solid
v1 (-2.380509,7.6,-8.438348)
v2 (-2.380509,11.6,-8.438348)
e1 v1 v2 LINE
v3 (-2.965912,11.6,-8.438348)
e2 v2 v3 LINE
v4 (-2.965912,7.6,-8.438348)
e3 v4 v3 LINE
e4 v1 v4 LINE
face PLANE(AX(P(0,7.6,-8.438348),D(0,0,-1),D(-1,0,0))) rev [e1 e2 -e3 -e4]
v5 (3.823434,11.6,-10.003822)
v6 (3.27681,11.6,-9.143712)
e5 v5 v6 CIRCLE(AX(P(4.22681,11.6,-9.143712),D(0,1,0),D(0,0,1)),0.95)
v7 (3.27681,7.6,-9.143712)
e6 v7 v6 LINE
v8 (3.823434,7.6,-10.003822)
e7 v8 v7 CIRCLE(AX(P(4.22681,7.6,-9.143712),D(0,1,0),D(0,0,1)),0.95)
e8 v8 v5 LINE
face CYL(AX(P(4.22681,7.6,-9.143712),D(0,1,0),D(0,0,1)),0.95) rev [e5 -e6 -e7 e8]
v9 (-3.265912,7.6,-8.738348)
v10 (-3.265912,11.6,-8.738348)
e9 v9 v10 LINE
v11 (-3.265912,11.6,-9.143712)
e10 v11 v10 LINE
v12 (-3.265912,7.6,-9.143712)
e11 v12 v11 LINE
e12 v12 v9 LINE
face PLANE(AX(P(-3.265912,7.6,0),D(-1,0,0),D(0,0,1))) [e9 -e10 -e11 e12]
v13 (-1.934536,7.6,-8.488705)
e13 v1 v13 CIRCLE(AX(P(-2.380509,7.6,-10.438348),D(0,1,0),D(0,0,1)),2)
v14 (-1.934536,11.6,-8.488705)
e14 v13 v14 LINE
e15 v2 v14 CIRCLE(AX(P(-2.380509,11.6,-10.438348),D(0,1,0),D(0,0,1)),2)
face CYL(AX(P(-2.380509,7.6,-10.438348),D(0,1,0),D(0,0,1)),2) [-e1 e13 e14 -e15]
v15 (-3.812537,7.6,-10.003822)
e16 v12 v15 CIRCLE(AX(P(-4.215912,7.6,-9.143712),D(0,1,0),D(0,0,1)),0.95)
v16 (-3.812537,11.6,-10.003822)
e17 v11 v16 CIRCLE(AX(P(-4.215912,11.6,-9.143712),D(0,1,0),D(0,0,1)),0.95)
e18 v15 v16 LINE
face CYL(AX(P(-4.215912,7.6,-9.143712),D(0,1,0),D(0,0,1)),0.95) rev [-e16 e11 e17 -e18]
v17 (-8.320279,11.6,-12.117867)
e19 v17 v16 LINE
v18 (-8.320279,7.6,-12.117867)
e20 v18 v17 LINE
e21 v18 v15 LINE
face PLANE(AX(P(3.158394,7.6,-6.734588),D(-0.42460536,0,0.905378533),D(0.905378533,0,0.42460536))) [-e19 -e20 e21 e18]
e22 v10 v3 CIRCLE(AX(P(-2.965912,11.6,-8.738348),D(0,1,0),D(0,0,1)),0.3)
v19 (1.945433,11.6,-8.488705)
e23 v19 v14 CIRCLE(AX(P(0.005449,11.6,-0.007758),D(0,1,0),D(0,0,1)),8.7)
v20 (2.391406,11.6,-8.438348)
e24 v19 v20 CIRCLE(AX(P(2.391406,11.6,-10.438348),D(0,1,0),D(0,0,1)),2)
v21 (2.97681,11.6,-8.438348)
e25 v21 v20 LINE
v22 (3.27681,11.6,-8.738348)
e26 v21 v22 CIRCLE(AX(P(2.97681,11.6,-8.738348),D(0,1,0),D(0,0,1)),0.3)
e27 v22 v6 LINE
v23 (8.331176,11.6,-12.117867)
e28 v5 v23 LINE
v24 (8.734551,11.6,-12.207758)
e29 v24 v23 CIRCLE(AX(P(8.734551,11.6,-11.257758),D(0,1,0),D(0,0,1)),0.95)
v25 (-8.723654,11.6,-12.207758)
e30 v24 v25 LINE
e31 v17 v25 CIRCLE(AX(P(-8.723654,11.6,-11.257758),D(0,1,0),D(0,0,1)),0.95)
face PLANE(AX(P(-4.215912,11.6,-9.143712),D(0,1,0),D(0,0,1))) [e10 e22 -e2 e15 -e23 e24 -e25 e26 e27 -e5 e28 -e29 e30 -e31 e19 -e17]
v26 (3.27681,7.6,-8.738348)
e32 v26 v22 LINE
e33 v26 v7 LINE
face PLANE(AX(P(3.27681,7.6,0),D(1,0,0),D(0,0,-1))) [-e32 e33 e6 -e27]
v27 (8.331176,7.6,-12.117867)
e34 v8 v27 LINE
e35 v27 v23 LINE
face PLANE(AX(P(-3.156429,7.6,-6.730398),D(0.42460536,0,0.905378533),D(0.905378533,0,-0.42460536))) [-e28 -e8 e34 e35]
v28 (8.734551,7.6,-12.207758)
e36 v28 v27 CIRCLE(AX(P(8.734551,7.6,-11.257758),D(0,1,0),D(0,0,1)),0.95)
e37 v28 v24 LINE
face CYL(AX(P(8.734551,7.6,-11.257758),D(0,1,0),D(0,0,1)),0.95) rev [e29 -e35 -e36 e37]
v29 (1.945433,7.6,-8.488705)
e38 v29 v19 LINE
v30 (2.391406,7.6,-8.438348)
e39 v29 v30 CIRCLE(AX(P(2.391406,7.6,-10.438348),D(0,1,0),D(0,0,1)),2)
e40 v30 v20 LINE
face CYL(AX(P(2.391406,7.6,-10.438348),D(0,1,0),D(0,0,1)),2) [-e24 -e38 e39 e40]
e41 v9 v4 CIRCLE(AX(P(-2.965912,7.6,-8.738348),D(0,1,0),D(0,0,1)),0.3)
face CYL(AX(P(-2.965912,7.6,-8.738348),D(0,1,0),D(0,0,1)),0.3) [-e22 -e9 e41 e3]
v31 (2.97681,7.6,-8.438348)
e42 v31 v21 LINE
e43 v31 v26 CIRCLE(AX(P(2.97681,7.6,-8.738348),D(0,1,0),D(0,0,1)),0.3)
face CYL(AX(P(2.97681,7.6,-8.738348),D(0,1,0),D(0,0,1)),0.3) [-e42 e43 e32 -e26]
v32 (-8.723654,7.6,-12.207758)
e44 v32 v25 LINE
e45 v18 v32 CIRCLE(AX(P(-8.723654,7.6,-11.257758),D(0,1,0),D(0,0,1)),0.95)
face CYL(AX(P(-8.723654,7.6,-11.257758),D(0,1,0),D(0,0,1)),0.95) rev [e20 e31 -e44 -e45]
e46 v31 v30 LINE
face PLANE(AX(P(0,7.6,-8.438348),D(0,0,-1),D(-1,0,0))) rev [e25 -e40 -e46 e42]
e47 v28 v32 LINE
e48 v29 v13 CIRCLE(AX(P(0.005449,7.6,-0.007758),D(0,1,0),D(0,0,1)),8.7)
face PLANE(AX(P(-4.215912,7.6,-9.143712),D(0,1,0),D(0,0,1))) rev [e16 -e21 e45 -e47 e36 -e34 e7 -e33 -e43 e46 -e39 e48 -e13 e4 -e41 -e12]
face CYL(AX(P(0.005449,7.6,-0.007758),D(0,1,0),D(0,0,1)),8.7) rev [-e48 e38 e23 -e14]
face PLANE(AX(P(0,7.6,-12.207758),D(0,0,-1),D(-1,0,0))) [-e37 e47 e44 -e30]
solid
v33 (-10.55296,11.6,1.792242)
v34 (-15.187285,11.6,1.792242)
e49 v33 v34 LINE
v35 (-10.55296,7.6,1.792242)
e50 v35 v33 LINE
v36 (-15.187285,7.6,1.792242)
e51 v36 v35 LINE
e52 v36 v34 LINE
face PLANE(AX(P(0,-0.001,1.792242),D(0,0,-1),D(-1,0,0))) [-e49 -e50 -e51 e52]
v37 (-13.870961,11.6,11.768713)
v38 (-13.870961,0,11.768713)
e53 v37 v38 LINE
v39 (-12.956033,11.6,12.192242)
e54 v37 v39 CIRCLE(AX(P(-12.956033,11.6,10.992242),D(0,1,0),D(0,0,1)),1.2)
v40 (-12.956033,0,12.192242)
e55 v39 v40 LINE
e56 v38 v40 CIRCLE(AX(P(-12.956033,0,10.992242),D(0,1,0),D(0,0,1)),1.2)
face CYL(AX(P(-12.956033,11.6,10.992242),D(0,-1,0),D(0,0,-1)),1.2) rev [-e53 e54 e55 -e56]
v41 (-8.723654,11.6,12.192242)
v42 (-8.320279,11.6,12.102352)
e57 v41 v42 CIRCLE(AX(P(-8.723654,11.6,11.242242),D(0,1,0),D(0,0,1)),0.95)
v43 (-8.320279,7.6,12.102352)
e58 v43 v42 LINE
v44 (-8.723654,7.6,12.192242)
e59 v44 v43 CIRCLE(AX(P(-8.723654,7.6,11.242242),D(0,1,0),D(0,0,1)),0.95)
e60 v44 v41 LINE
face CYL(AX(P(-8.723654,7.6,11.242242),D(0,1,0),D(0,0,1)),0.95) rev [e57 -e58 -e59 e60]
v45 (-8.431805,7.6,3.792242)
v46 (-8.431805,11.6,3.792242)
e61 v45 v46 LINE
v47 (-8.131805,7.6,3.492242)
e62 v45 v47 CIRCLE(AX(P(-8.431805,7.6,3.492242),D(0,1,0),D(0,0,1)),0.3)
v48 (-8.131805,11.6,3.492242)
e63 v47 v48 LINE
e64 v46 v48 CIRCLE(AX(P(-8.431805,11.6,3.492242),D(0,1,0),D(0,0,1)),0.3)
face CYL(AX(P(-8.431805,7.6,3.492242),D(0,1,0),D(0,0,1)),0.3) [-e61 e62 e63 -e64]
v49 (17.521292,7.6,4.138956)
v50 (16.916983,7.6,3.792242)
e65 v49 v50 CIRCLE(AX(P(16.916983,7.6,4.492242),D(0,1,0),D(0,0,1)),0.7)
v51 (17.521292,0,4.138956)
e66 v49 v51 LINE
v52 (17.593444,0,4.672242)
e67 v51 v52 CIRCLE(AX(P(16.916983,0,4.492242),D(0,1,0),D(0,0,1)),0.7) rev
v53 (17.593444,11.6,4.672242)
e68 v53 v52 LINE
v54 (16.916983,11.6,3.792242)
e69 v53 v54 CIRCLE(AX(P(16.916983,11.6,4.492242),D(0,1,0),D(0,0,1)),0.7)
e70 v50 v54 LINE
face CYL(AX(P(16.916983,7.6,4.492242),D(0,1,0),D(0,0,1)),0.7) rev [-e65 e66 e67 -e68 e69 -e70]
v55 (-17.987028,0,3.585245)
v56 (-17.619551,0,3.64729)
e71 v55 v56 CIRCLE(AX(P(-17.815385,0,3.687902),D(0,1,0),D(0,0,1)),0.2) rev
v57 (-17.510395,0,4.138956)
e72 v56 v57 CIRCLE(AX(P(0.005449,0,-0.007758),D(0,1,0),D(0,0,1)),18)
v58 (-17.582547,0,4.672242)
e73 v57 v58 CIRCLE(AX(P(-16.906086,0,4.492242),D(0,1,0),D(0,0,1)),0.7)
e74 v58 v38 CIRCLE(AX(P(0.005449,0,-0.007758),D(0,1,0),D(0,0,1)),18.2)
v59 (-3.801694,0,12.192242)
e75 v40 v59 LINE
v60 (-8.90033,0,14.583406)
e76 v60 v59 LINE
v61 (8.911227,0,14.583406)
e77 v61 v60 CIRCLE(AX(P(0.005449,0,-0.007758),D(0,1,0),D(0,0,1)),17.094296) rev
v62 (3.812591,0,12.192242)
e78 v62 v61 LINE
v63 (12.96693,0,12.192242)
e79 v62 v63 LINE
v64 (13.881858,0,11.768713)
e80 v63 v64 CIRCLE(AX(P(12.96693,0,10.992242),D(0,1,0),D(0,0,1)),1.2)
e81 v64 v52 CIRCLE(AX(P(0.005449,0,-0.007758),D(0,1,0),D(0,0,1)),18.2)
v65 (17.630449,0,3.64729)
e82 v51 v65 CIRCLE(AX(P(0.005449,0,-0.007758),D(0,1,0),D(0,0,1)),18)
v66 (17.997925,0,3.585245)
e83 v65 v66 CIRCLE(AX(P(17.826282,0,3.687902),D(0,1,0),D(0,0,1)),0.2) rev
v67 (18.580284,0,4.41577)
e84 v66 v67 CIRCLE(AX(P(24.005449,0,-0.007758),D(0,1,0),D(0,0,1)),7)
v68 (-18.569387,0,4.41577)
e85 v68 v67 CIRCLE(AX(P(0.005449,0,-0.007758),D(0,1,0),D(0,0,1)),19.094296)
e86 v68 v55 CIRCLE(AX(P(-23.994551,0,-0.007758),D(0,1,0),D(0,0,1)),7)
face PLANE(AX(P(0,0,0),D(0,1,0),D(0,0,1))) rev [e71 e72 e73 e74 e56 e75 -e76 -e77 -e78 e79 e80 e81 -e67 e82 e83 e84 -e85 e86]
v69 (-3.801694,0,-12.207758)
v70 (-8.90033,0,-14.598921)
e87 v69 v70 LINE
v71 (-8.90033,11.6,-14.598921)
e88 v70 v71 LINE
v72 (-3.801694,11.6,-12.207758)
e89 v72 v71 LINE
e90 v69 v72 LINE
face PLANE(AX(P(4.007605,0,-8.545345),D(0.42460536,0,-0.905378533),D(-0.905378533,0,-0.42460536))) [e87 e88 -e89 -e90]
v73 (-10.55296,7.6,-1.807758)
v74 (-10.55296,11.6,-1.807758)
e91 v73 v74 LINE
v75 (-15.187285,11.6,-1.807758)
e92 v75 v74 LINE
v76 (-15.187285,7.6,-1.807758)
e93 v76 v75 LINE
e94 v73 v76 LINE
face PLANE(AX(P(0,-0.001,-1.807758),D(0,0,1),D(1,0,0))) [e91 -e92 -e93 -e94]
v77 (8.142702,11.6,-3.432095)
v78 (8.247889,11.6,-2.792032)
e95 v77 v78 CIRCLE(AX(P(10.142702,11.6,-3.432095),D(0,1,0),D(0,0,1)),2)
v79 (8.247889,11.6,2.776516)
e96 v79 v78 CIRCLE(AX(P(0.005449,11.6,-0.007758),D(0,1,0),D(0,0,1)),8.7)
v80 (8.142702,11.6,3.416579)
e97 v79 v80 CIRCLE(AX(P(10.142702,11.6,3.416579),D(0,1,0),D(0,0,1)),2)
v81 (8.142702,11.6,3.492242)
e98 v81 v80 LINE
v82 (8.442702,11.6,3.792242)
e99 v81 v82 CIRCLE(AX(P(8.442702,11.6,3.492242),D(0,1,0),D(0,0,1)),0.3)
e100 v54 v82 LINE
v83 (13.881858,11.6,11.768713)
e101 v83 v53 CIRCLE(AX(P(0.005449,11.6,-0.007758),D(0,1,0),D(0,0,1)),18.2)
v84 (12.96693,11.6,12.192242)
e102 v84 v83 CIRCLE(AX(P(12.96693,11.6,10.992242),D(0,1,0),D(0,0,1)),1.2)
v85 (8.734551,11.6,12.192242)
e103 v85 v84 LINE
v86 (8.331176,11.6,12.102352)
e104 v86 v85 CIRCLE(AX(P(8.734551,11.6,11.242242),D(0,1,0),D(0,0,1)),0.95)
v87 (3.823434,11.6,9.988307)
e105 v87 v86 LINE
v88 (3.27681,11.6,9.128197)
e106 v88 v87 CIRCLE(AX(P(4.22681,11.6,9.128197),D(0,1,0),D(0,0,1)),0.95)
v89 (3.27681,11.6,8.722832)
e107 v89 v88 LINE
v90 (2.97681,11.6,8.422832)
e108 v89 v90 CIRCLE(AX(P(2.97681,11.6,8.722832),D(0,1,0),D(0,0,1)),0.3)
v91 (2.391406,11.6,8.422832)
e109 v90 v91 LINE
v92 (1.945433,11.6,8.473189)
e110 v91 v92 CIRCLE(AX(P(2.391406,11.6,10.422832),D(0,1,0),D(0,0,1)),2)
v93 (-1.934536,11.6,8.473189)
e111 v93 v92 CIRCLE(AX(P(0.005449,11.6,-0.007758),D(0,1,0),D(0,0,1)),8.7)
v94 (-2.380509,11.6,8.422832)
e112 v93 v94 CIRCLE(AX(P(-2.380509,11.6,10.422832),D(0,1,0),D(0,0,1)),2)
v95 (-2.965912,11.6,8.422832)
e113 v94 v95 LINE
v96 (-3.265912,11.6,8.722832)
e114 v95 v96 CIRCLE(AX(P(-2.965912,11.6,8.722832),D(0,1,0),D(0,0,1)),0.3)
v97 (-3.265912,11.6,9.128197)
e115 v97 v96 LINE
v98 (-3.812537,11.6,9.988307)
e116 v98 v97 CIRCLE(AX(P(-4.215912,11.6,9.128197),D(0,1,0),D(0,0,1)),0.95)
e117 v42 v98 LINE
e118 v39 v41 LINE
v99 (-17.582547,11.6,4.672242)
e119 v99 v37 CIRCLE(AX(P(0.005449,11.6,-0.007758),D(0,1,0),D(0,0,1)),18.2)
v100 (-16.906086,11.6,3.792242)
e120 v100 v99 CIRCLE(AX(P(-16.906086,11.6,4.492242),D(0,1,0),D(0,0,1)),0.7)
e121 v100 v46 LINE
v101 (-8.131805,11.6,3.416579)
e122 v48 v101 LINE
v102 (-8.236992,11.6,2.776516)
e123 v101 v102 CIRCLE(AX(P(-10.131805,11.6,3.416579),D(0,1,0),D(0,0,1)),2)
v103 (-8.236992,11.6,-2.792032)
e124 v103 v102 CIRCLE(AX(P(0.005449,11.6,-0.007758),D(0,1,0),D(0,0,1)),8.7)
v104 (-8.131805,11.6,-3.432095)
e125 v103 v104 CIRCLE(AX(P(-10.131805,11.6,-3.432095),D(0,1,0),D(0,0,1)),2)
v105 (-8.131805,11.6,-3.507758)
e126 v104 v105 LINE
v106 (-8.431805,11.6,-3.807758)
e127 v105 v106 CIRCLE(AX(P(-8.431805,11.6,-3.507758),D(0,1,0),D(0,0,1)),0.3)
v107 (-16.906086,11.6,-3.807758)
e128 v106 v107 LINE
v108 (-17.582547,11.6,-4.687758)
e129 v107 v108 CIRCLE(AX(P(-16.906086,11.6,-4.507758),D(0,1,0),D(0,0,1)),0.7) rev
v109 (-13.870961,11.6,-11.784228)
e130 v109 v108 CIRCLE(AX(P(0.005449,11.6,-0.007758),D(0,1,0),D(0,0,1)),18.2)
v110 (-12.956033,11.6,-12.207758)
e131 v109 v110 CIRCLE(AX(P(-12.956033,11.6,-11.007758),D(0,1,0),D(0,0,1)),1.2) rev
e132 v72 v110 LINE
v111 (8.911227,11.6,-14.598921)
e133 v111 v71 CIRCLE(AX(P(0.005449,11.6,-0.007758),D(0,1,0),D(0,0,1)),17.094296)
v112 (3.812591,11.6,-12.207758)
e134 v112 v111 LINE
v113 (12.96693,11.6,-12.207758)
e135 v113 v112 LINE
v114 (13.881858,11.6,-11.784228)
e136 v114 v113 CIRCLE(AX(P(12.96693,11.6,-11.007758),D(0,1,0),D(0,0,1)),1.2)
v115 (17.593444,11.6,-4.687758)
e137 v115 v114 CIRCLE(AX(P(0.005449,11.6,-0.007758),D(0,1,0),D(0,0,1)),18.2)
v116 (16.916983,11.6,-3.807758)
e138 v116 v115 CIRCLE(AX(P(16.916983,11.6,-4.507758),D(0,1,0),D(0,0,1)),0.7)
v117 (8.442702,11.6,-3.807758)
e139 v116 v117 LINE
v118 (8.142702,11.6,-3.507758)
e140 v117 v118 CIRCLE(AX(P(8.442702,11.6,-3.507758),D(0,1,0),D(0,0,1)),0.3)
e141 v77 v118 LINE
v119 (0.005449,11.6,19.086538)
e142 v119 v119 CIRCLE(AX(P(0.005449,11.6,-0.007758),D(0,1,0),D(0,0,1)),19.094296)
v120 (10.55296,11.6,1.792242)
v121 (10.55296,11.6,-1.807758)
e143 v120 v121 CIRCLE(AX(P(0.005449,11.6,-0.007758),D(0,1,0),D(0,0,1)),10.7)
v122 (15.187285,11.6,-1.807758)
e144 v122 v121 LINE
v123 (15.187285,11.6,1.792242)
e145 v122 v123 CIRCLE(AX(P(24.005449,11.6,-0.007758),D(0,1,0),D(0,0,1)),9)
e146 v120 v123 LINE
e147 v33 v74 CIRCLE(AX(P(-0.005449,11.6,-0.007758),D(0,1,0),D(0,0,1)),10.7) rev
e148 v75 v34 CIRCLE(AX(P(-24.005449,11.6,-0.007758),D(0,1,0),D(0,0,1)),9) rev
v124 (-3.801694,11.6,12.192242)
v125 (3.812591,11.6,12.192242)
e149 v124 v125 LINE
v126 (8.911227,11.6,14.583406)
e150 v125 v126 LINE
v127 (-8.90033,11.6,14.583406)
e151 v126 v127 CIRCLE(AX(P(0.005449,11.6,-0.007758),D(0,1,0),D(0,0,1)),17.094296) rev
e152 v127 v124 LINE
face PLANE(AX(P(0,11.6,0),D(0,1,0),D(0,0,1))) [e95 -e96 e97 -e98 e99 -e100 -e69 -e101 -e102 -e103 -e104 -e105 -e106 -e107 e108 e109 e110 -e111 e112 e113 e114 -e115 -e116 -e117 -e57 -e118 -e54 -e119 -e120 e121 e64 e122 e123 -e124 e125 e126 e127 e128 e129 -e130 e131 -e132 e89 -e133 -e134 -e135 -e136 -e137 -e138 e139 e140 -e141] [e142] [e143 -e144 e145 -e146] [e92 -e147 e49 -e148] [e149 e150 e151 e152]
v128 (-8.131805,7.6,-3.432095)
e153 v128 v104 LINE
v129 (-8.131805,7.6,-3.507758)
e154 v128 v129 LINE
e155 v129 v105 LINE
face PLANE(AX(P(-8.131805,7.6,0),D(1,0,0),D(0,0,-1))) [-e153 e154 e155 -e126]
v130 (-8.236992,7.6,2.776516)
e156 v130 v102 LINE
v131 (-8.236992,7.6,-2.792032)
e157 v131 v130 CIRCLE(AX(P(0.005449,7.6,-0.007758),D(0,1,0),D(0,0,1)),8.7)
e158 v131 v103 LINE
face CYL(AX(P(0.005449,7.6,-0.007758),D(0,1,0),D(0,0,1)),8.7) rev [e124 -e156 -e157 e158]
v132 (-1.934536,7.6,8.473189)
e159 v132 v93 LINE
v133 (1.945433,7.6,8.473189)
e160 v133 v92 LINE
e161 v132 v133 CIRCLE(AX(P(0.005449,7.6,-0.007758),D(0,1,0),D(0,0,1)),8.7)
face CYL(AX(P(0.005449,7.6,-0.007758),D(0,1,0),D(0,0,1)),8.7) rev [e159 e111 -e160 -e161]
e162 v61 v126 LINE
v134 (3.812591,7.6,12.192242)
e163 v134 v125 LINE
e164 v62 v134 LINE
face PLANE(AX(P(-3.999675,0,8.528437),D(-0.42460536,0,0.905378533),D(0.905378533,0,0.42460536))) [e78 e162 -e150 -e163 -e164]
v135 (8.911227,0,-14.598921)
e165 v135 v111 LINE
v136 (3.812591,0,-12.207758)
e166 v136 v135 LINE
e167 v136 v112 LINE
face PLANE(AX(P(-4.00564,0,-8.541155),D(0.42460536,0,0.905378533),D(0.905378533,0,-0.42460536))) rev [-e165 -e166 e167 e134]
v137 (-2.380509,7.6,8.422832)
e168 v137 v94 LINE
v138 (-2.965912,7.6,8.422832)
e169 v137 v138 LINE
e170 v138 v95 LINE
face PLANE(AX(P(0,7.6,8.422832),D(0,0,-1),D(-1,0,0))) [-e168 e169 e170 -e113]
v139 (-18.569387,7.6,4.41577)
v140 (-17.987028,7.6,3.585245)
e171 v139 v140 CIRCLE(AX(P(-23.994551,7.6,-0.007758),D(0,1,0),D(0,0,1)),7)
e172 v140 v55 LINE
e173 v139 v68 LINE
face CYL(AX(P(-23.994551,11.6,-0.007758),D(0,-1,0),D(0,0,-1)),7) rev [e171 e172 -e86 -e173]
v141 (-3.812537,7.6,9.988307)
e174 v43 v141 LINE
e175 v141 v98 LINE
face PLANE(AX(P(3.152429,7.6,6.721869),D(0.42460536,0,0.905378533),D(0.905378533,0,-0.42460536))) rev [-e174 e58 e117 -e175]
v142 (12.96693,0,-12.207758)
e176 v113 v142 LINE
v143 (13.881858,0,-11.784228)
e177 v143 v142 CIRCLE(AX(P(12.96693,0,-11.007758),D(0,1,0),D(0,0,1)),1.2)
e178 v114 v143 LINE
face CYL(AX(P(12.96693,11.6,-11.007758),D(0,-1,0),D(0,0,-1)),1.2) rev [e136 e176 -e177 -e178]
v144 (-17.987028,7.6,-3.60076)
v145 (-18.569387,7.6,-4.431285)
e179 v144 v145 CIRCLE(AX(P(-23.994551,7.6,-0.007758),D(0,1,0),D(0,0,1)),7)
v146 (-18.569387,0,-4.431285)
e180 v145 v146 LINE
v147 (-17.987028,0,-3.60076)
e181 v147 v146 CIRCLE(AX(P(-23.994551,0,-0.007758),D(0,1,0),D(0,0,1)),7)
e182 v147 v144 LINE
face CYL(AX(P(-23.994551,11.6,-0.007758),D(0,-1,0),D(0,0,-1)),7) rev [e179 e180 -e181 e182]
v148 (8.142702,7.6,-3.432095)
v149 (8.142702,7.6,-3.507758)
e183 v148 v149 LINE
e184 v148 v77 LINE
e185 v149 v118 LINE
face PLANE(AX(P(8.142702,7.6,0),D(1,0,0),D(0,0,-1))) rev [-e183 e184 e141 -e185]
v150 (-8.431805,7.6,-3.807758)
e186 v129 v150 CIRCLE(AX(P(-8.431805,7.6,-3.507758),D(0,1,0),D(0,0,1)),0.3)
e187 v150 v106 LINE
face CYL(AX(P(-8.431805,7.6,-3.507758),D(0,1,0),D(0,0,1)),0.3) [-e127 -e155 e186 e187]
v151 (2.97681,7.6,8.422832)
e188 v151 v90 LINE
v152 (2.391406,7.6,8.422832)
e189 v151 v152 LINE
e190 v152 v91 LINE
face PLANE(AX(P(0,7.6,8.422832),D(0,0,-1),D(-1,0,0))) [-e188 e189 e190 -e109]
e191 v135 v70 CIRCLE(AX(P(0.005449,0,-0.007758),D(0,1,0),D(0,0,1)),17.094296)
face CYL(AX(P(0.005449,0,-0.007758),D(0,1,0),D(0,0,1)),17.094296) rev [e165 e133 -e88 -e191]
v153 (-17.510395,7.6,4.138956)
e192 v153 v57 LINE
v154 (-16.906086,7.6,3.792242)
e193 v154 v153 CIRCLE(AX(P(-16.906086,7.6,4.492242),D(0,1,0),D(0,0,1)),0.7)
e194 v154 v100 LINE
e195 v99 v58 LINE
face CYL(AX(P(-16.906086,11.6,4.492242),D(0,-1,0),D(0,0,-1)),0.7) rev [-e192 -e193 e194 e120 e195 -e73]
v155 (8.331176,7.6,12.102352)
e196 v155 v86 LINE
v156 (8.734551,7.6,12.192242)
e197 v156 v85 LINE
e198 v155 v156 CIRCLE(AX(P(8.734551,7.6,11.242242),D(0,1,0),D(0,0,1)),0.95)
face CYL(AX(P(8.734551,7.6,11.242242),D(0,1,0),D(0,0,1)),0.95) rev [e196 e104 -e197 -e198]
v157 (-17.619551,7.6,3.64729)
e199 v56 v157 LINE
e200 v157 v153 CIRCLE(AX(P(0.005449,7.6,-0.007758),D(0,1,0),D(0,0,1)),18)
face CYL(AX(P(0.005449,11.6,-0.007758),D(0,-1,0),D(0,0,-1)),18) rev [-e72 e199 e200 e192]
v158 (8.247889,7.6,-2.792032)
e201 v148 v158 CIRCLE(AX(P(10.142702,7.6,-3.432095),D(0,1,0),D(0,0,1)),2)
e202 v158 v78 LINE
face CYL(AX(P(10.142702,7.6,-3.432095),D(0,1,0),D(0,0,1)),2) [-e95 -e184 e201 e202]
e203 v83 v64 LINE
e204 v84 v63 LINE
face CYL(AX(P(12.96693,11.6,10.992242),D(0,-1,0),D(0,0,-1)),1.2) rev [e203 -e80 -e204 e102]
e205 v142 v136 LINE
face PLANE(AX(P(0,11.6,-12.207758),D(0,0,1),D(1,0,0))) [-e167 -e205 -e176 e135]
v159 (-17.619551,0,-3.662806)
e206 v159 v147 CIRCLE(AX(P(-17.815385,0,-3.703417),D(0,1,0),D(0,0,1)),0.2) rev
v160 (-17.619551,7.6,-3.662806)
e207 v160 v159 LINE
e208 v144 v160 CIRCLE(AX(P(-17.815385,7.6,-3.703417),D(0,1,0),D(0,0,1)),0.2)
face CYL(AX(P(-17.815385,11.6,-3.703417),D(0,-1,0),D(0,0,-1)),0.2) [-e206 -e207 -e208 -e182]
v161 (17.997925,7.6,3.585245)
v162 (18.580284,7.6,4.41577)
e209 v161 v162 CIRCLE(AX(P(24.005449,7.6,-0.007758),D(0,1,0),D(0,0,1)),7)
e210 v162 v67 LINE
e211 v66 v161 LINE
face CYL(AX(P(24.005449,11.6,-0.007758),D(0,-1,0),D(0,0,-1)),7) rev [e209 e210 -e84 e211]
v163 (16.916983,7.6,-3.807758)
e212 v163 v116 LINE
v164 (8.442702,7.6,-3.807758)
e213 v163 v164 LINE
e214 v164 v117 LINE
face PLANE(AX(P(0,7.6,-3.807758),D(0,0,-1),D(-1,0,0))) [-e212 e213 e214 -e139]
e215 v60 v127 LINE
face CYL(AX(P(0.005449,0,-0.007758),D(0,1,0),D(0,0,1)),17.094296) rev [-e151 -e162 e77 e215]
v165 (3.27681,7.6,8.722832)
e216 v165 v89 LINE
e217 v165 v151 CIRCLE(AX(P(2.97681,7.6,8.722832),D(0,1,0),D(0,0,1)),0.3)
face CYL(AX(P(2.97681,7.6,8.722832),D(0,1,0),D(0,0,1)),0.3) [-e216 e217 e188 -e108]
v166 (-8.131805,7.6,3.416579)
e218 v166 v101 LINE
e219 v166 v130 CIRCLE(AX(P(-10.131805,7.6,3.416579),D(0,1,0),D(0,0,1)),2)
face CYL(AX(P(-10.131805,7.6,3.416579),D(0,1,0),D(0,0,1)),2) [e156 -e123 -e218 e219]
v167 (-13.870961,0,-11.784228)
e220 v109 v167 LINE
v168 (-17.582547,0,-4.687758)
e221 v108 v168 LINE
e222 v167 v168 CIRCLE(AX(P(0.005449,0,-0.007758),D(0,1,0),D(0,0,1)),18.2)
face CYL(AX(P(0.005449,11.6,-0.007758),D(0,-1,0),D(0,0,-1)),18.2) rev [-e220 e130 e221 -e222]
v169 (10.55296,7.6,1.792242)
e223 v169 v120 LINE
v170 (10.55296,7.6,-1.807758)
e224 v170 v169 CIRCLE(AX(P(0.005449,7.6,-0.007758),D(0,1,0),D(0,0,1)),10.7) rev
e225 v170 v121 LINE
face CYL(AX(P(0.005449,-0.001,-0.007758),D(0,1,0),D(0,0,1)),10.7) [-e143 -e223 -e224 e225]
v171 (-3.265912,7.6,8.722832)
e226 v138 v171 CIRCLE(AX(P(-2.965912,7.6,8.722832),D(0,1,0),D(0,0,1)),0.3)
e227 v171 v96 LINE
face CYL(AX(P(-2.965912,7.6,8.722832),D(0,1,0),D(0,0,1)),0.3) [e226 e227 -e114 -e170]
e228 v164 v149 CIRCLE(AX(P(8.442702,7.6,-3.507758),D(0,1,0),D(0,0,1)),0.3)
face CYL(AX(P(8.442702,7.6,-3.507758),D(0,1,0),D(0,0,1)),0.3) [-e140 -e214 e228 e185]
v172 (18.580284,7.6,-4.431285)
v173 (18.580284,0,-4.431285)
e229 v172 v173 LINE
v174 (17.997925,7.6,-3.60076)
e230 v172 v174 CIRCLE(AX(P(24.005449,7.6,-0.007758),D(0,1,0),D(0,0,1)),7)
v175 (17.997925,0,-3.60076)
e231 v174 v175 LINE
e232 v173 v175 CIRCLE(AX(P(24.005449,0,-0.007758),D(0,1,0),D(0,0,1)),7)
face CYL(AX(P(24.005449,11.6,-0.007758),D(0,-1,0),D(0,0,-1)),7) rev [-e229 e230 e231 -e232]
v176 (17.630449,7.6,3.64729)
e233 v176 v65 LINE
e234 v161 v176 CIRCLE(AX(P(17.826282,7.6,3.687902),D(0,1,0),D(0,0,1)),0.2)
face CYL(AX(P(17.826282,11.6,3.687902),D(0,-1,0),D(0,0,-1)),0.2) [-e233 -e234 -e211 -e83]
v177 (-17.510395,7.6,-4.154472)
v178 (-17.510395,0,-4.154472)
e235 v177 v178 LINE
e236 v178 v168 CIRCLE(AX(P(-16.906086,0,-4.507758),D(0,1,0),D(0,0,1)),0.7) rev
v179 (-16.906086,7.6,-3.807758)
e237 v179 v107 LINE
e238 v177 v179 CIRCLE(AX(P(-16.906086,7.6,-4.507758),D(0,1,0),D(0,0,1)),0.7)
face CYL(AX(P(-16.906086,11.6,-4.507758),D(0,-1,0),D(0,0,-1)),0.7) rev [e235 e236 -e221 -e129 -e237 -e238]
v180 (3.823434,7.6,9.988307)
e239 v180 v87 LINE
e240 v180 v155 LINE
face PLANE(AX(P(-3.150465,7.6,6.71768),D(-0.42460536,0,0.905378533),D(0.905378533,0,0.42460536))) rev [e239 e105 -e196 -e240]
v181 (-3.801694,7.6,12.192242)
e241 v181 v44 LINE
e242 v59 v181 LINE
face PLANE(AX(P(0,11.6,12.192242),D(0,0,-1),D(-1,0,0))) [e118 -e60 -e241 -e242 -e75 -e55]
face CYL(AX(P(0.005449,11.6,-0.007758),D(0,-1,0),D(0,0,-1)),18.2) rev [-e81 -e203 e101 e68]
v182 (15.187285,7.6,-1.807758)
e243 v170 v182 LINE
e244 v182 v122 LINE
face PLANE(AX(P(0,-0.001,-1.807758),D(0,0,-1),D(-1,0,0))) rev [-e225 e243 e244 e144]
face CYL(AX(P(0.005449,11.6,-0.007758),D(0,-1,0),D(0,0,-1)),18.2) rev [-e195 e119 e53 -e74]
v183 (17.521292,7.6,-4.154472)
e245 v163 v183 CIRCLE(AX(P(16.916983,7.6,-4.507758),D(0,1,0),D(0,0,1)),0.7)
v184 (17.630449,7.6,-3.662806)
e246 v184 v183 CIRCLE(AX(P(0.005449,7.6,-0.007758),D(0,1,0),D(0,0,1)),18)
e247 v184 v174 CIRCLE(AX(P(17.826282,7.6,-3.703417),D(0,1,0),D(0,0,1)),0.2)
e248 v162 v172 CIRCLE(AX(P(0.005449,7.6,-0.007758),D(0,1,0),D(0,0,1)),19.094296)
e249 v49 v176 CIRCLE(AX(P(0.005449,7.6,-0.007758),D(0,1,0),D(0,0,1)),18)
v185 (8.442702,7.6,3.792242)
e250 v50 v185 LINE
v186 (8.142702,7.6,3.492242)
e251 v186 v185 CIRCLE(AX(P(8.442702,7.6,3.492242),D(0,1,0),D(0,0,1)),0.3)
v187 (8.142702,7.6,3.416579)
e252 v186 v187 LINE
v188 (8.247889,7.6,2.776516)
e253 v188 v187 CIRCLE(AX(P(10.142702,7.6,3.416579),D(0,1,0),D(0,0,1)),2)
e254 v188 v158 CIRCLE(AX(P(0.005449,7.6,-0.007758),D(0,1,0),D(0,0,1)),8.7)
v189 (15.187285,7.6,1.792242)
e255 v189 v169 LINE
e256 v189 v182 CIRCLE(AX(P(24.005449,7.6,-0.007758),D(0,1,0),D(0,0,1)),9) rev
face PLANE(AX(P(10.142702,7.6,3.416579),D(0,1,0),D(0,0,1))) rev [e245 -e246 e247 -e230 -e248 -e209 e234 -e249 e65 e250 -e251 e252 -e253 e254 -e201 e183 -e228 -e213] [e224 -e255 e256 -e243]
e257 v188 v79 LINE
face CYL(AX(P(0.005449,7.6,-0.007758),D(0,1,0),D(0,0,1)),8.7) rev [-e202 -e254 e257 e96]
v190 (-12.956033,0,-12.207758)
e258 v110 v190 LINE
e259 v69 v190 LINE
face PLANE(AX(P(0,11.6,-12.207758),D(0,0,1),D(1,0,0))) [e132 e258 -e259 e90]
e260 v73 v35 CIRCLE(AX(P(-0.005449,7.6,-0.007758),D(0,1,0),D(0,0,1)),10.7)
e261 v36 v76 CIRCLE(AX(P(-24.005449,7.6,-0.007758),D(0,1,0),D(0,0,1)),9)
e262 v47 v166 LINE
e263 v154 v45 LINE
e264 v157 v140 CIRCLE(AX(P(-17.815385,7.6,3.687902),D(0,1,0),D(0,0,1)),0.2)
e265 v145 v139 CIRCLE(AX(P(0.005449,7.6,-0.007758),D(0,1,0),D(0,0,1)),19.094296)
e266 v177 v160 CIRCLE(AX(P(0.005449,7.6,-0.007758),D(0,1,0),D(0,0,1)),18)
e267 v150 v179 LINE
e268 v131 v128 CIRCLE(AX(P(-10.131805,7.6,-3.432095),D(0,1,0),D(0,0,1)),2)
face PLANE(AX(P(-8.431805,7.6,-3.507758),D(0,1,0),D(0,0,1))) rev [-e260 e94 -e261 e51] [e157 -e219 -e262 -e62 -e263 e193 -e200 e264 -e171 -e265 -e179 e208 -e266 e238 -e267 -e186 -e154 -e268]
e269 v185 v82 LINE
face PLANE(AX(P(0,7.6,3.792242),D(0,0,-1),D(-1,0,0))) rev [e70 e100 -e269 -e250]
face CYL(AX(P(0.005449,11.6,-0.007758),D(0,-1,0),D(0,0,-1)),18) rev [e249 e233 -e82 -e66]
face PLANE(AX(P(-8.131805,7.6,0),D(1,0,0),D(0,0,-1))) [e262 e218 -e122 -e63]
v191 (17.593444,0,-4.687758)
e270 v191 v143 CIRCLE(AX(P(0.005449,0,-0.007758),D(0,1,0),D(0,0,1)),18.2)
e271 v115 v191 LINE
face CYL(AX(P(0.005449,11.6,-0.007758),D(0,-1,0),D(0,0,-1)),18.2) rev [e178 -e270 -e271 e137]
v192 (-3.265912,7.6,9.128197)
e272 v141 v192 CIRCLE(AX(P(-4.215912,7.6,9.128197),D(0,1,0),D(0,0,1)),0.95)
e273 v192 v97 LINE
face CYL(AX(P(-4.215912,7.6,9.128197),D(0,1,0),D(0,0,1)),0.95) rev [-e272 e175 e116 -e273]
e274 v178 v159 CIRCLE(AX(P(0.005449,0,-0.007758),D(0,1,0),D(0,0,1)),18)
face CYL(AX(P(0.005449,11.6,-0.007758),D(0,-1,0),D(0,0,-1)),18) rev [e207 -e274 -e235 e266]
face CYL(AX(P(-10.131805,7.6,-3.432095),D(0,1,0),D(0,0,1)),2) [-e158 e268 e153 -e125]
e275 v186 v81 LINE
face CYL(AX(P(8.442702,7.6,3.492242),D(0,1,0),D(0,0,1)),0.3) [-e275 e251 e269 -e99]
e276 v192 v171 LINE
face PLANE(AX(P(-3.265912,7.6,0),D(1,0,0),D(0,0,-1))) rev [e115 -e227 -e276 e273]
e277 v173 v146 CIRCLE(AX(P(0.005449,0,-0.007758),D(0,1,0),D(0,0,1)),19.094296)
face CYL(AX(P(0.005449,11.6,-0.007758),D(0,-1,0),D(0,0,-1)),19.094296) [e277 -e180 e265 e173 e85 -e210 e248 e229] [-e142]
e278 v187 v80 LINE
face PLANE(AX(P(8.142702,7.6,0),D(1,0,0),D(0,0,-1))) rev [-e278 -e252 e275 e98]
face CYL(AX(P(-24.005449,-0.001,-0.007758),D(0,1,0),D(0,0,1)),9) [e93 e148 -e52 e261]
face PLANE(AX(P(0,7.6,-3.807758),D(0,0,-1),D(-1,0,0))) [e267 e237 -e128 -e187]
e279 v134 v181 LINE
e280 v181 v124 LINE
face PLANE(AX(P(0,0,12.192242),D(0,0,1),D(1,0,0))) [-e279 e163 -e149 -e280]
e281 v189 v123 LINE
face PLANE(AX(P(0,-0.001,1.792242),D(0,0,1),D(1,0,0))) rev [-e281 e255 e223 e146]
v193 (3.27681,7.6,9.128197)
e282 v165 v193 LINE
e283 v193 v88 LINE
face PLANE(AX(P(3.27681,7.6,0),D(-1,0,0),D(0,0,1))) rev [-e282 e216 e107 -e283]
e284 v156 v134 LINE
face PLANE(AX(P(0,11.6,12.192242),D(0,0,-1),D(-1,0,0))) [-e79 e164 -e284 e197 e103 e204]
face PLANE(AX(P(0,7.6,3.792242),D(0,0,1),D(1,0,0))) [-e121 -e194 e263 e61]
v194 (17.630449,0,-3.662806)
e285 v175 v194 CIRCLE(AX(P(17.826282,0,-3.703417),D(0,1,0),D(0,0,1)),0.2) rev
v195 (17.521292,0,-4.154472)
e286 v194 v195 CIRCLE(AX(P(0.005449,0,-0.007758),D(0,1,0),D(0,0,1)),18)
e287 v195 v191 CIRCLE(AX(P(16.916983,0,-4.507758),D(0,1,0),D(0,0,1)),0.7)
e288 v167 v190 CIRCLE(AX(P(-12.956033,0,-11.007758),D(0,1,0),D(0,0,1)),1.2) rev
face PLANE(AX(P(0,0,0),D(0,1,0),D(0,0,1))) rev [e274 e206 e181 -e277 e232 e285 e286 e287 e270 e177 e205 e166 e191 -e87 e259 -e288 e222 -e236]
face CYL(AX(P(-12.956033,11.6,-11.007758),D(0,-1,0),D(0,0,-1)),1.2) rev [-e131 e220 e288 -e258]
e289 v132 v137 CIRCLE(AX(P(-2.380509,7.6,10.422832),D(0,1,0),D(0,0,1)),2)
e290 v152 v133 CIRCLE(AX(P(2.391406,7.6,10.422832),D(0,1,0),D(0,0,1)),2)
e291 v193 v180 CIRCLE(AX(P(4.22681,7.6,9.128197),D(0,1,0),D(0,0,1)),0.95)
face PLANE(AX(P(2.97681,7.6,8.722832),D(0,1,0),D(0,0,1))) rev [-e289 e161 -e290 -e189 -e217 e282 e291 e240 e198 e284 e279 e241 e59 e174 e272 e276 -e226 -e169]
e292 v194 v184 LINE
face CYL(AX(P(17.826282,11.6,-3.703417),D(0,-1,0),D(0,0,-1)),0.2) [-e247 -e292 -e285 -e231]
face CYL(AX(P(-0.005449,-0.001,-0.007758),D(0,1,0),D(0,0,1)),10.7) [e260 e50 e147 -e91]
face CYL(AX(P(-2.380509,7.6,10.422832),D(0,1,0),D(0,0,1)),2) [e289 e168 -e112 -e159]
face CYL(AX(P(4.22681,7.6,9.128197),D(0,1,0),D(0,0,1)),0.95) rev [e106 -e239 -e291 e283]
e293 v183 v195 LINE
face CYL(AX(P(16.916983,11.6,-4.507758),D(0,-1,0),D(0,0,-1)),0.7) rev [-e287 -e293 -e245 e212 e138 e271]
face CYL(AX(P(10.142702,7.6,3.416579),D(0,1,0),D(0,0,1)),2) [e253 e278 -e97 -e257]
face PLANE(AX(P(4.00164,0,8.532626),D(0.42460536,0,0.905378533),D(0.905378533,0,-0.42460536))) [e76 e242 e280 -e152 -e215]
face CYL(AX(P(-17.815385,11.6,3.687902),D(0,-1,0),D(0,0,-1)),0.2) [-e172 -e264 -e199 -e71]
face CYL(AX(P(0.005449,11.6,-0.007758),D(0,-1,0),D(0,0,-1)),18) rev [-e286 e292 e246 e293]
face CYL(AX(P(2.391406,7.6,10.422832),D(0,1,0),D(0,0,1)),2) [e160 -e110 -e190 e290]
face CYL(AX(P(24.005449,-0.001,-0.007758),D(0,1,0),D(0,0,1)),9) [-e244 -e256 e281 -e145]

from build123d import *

# Parameters (mm, degrees)
BOSS_EXTRUDE3_DEPTH     = 11.6
BOSS_EXTRUDE4_START     = 7.6
BOSS_EXTRUDE4_DEPTH     = 4
BOSS_EXTRUDE4_2_DEPTH   = 4
BOSS_EXTRUDE5_START     = 7.6
BOSS_EXTRUDE5_DEPTH     = 4
CUT_EXTRUDE2_DEPTH      = 30.063300051
CUT_EXTRUDE2_DEPTH_BACK = 30.063300051
CUT_EXTRUDE3_DEPTH      = 4
BOSS_EXTRUDE7_START     = -4
BOSS_EXTRUDE7_DEPTH     = 4
FILLET2_R               = 0.2


# Read off the part's stored shape, not the designer's step: Boss-Extrude4
with BuildPart() as part:
    # Sketch1 → Boss-Extrude3 (new body)
    with BuildSketch(Plane(origin=(0, 0, 0), x_dir=(1, 0, 0), z_dir=(0, 1, 0))):
        with BuildLine():
            ThreePointArc((-17.58254737, -4.672242255), (-17.599765659, -4.398388566), (-17.51039467, -4.138956227))
            ThreePointArc((-17.51039467, -4.138956227), (-17.599328192, -3.743486895), (-17.679334072, -3.346115252))
            ThreePointArc((-17.679334072, -3.346115252), (-17.701943431, -3.224620591), (-17.72371813, -3.102973568))
            ThreePointArc((-17.72371813, -3.102973568), (-18.10982994, -3.783027476), (-18.569387356, -4.415769626))
            ThreePointArc((-18.569387356, -4.415769626), (0.005448536, -19.086537812), (18.580284429, -4.415769626))
            ThreePointArc((18.580284429, -4.415769626), (18.120727013, -3.783027476), (17.734615203, -3.102973568))
            ThreePointArc((17.734615203, -3.102973568), (17.712840504, -3.224620591), (17.690231145, -3.346115252))
            ThreePointArc((17.690231145, -3.346115252), (17.610225265, -3.743486895), (17.521291743, -4.138956227))
            ThreePointArc((17.521291743, -4.138956227), (17.610662732, -4.398388566), (17.593444443, -4.672242255))
            ThreePointArc((17.593444443, -4.672242255), (16.132822021, -8.427159236), (13.881858032, -11.768712843))
            ThreePointArc((13.881858032, -11.768712843), (13.609040764, -12.005994533), (13.277928812, -12.151241693))
            ThreePointArc((13.277928812, -12.151241693), (0.005448536, -17.992242255), (-13.267031739, -12.151241693))
            ThreePointArc((-13.267031739, -12.151241693), (-13.598143691, -12.005994533), (-13.870960959, -11.768712843))
            ThreePointArc((-13.870960959, -11.768712843), (-16.121924949, -8.427159236), (-17.58254737, -4.672242255))
        make_face()
        with BuildLine():
            ThreePointArc((-17.679334072, 3.361630743), (-17.599328192, 3.759002385), (-17.51039467, 4.154471717))
            ThreePointArc((-17.51039467, 4.154471717), (-17.599765659, 4.413904056), (-17.58254737, 4.687757745))
            ThreePointArc((-17.58254737, 4.687757745), (-16.121924949, 8.442674726), (-13.870960959, 11.784228333))
            ThreePointArc((-13.870960959, 11.784228333), (-13.598143691, 12.021510023), (-13.267031739, 12.166757183))
            ThreePointArc((-13.267031739, 12.166757183), (0.005448536, 18.007757745), (13.277928812, 12.166757183))
            ThreePointArc((13.277928812, 12.166757183), (13.609040764, 12.021510023), (13.881858032, 11.784228333))
            ThreePointArc((13.881858032, 11.784228333), (16.132822021, 8.442674726), (17.593444443, 4.687757745))
            ThreePointArc((17.593444443, 4.687757745), (17.610662732, 4.413904056), (17.521291743, 4.154471717))
            ThreePointArc((17.521291743, 4.154471717), (17.610225265, 3.759002385), (17.690231145, 3.361630743))
            ThreePointArc((17.690231145, 3.361630743), (17.712840504, 3.240136082), (17.734615203, 3.118489059))
            ThreePointArc((17.734615203, 3.118489059), (18.120727013, 3.798542966), (18.580284429, 4.431285117))
            ThreePointArc((18.580284429, 4.431285117), (0.005448536, 19.102053303), (-18.569387356, 4.431285117))
            ThreePointArc((-18.569387356, 4.431285117), (-18.10982994, 3.798542966), (-17.72371813, 3.118489059))
            ThreePointArc((-17.72371813, 3.118489059), (-17.701943431, 3.240136082), (-17.679334072, 3.361630743))
        make_face()
        with BuildLine():
            ThreePointArc((13.277928812, 12.166757183), (0.005448536, 18.007757745), (-13.267031739, 12.166757183))
            ThreePointArc((-13.267031739, 12.166757183), (-13.112877807, 12.197463449), (-12.95603286, 12.207757745))
            Line((-12.95603286, 12.207757745), (-12.242000178, 12.207757745))
            Line((-12.242000178, 12.207757745), (-8.72365395, 12.207757745))
            Line((-8.72365395, 12.207757745), (8.734551023, 12.207757745))
            Line((8.734551023, 12.207757745), (12.25289725, 12.207757745))
            Line((12.25289725, 12.207757745), (12.966929933, 12.207757745))
            ThreePointArc((12.966929933, 12.207757745), (13.123774879, 12.197463449), (13.277928812, 12.166757183))
        make_face()
        with BuildLine():
            ThreePointArc((-12.95603286, -12.192242255), (-13.112877807, -12.181947959), (-13.267031739, -12.151241693))
            ThreePointArc((-13.267031739, -12.151241693), (0.005448536, -17.992242255), (13.277928812, -12.151241693))
            ThreePointArc((13.277928812, -12.151241693), (13.123774879, -12.181947959), (12.966929933, -12.192242255))
            Line((12.966929933, -12.192242255), (12.25289725, -12.192242255))
            Line((12.25289725, -12.192242255), (8.734551023, -12.192242255))
            Line((8.734551023, -12.192242255), (-8.72365395, -12.192242255))
            Line((-8.72365395, -12.192242255), (-12.242000178, -12.192242255))
            Line((-12.242000178, -12.192242255), (-12.95603286, -12.192242255))
        make_face()
    extrude(amount=BOSS_EXTRUDE3_DEPTH)

    # Boss-Extrude4 2 outline → Boss-Extrude4 2 (add)
    with BuildSketch(Plane(origin=(0, 0, 0), x_dir=(1, 0, 0), z_dir=(0, 1, 0)).offset(BOSS_EXTRUDE4_START)):
        with BuildLine():
            Line((3.276809518, -9.128196989), (3.276809518, -8.722832237))
            ThreePointArc((3.276809518, -8.722832237), (3.188941552, -8.510700203), (2.976809518, -8.422832237))
            Line((2.976809518, -8.422832237), (2.391405915, -8.422832237))
            ThreePointArc((2.391405915, -8.422832237), (2.167002233, -8.435461364), (1.945432574, -8.47318925))
            ThreePointArc((1.945432574, -8.47318925), (0.005448536, -8.692242255), (-1.934535501, -8.47318925))
            ThreePointArc((-1.934535501, -8.47318925), (-2.156105161, -8.435461364), (-2.380508843, -8.422832237))
            Line((-2.380508843, -8.422832237), (-2.965912445, -8.422832237))
            ThreePointArc((-2.965912445, -8.422832237), (-3.178044479, -8.510700203), (-3.265912445, -8.722832237))
            Line((-3.265912445, -8.722832237), (-3.265912445, -9.128196989))
            ThreePointArc((-3.265912445, -9.128196989), (-3.414131198, -9.637752512), (-3.812537354, -9.988306595))
            Line((-3.812537354, -9.988306595), (-8.320278858, -12.102351861))
            ThreePointArc((-8.320278858, -12.102351861), (-8.517019159, -12.169497378), (-8.72365395, -12.192242255))
            Line((-8.72365395, -12.192242255), (8.734551023, -12.192242255))
            ThreePointArc((8.734551023, -12.192242255), (8.527916232, -12.169497378), (8.331175931, -12.102351861))
            Line((8.331175931, -12.102351861), (3.823434427, -9.988306595))
            ThreePointArc((3.823434427, -9.988306595), (3.425028271, -9.637752512), (3.276809518, -9.128196989))
        make_face()
    extrude(amount=BOSS_EXTRUDE4_2_DEPTH)

    # Sketch1<9> → Boss-Extrude5 (add)
    with BuildSketch(Plane(origin=(0, 0, 0), x_dir=(1, 0, 0), z_dir=(0, 1, 0)).offset(BOSS_EXTRUDE5_START)):
        with BuildLine():
            Line((-8.131805397, -3.492242255), (-8.131805397, -3.41657908))
            ThreePointArc((-8.131805397, -3.41657908), (-8.15827713, -3.092254889), (-8.236991578, -2.776516122))
            ThreePointArc((-8.236991578, -2.776516122), (-8.694551464, 0.007757745), (-8.236991578, 2.792031613))
            ThreePointArc((-8.236991578, 2.792031613), (-8.15827713, 3.10777038), (-8.131805397, 3.432094571))
            Line((-8.131805397, 3.432094571), (-8.131805397, 3.507757745))
            ThreePointArc((-8.131805397, 3.507757745), (-8.219673362, 3.71988978), (-8.431805397, 3.807757745))
            Line((-8.431805397, 3.807757745), (-16.906085989, 3.807757745))
            ThreePointArc((-16.906085989, 3.807757745), (-17.2544391, 3.900592109), (-17.51039467, 4.154471717))
            ThreePointArc((-17.51039467, 4.154471717), (-17.624667608, 3.638047643), (-17.72371813, 3.118489059))
            ThreePointArc((-17.72371813, 3.118489059), (-16.994551464, 0.007757745), (-17.72371813, -3.102973568))
            ThreePointArc((-17.72371813, -3.102973568), (-17.624667608, -3.622532153), (-17.51039467, -4.138956227))
            ThreePointArc((-17.51039467, -4.138956227), (-17.2544391, -3.885076619), (-16.906085989, -3.792242255))
            Line((-16.906085989, -3.792242255), (-8.431805397, -3.792242255))
            ThreePointArc((-8.431805397, -3.792242255), (-8.219673362, -3.704374289), (-8.131805397, -3.492242255))
        make_face()
        with BuildLine():
            ThreePointArc((16.916983062, -3.792242255), (17.265336173, -3.885076619), (17.521291743, -4.138956227))
            ThreePointArc((17.521291743, -4.138956227), (17.635564681, -3.622532153), (17.734615203, -3.102973568))
            ThreePointArc((17.734615203, -3.102973568), (17.005448536, 0.007757745), (17.734615203, 3.118489059))
            ThreePointArc((17.734615203, 3.118489059), (17.635564681, 3.638047643), (17.521291743, 4.154471717))
            ThreePointArc((17.521291743, 4.154471717), (17.265336173, 3.900592109), (16.916983062, 3.807757745))
            Line((16.916983062, 3.807757745), (8.44270247, 3.807757745))
            ThreePointArc((8.44270247, 3.807757745), (8.230570435, 3.71988978), (8.14270247, 3.507757745))
            Line((8.14270247, 3.507757745), (8.14270247, 3.432094571))
            ThreePointArc((8.14270247, 3.432094571), (8.169174203, 3.10777038), (8.24788865, 2.792031613))
            ThreePointArc((8.24788865, 2.792031613), (8.705448536, 0.007757745), (8.24788865, -2.776516122))
            ThreePointArc((8.24788865, -2.776516122), (8.169174203, -3.092254889), (8.14270247, -3.41657908))
            Line((8.14270247, -3.41657908), (8.14270247, -3.492242255))
            ThreePointArc((8.14270247, -3.492242255), (8.230570435, -3.704374289), (8.44270247, -3.792242255))
            Line((8.44270247, -3.792242255), (16.916983062, -3.792242255))
        make_face()
    extrude(amount=BOSS_EXTRUDE5_DEPTH)

    # Sketch2 → Cut-Extrude2 (cut, two sides: drawn at the far end of the back side and taken through both)
    with BuildSketch(Plane(origin=(0, 11.6, 0), x_dir=(1, 0, 0), z_dir=(0, 1, 0)).offset(-CUT_EXTRUDE2_DEPTH_BACK)):
        with BuildLine():
            Line((-8.900330018, 14.598921131), (-3.801694427, 12.207757745))
            Line((-3.801694427, 12.207757745), (3.812591499, 12.207757745))
            Line((3.812591499, 12.207757745), (8.911227091, 14.598921131))
            ThreePointArc((8.911227091, 14.598921131), (0.005448536, 17.102053303), (-8.900330018, 14.598921131))
        make_face()
        with BuildLine():
            Line((-3.801694427, -12.192242255), (-8.900330018, -14.58340564))
            ThreePointArc((-8.900330018, -14.58340564), (0.005448536, -17.086537812), (8.911227091, -14.58340564))
            Line((8.911227091, -14.58340564), (3.812591499, -12.192242255))
            Line((3.812591499, -12.192242255), (-3.801694427, -12.192242255))
        make_face()
    extrude(amount=CUT_EXTRUDE2_DEPTH + CUT_EXTRUDE2_DEPTH_BACK, mode=Mode.SUBTRACT)

    # Sketch3 → Cut-Extrude3 (cut)
    with BuildSketch(Plane(origin=(0, 11.6, 0), x_dir=(1, 0, 0), z_dir=(0, 1, 0))):
        with BuildLine():
            Line((-15.187285462, 1.807757745), (-10.552960091, 1.807757745))
            ThreePointArc((-10.552960091, 1.807757745), (-10.705448536, 0.007757745), (-10.552960091, -1.792242255))
            Line((-10.552960091, -1.792242255), (-15.187285462, -1.792242255))
            ThreePointArc((-15.187285462, -1.792242255), (-15.005448536, 0.007757745), (-15.187285462, 1.807757745))
        make_face()
        with BuildLine():
            ThreePointArc((10.552960091, -1.792242255), (10.705448536, 0.007757745), (10.552960091, 1.807757745))
            Line((10.552960091, 1.807757745), (15.187285462, 1.807757745))
            ThreePointArc((15.187285462, 1.807757745), (15.005448536, 0.007757745), (15.187285462, -1.792242255))
            Line((15.187285462, -1.792242255), (10.552960091, -1.792242255))
        make_face()
    extrude(amount=-CUT_EXTRUDE3_DEPTH, mode=Mode.SUBTRACT)

    # Sketch6 → Boss-Extrude7 (add)
    with BuildSketch(Plane(origin=(0, 11.6, 0), x_dir=(1, 0, 0), z_dir=(0, 1, 0)).offset(BOSS_EXTRUDE7_START)):
        with BuildLine():
            ThreePointArc((-18.569387356, 4.431285117), (-19.088847021, 0.007757745), (-18.569387356, -4.415769626))
            ThreePointArc((-18.569387356, -4.415769626), (-16.994551464, 0.007757745), (-18.569387356, 4.431285117))
        make_face()
        with BuildLine():
            ThreePointArc((18.580284429, -4.415769626), (19.099744094, 0.007757745), (18.580284429, 4.431285117))
            ThreePointArc((18.580284429, 4.431285117), (17.005448536, 0.007757745), (18.580284429, -4.415769626))
        make_face()
    extrude(amount=BOSS_EXTRUDE7_DEPTH)

    # Fillet2
    fillet2_edges = [part.edges().sort_by_distance(p)[0] for p in [
        (-17.72371813, 3.8, 3.102973568),
        (-17.72371813, 3.8, -3.118489059),
        (17.734615203, 3.8, -3.118489059),
        (17.734615203, 3.8, 3.102973568),
    ]]
    fillet(fillet2_edges, radius=FILLET2_R)


with BuildPart() as body_2:
    # Boss-Extrude4 outline → Boss-Extrude4 (new body)
    with BuildSketch(Plane(origin=(0, 0, 0), x_dir=(1, 0, 0), z_dir=(0, 1, 0)).offset(BOSS_EXTRUDE4_START)):
        with BuildLine():
            ThreePointArc((-3.812537354, 10.003822086), (-3.414131198, 9.653268002), (-3.265912445, 9.143712479))
            Line((-3.265912445, 9.143712479), (-3.265912445, 8.738347728))
            ThreePointArc((-3.265912445, 8.738347728), (-3.17804448, 8.526215693), (-2.965912445, 8.438347728))
            Line((-2.965912445, 8.438347728), (-2.380508843, 8.438347728))
            ThreePointArc((-2.380508843, 8.438347728), (-2.156105161, 8.450976855), (-1.934535501, 8.48870474))
            ThreePointArc((-1.934535501, 8.48870474), (0.005448536, 8.707757745), (1.945432574, 8.48870474))
            ThreePointArc((1.945432574, 8.48870474), (2.167002233, 8.450976855), (2.391405915, 8.438347728))
            Line((2.391405915, 8.438347728), (2.976809518, 8.438347728))
            ThreePointArc((2.976809518, 8.438347728), (3.188941553, 8.526215693), (3.276809518, 8.738347728))
            Line((3.276809518, 8.738347728), (3.276809518, 9.143712479))
            ThreePointArc((3.276809518, 9.143712479), (3.425028271, 9.653268002), (3.823434427, 10.003822086))
            Line((3.823434427, 10.003822086), (8.331175931, 12.117867352))
            ThreePointArc((8.331175931, 12.117867352), (8.527916232, 12.185012868), (8.734551023, 12.207757745))
            Line((8.734551023, 12.207757745), (-8.72365395, 12.207757745))
            ThreePointArc((-8.72365395, 12.207757745), (-8.517019159, 12.185012868), (-8.320278858, 12.117867352))
            Line((-8.320278858, 12.117867352), (-3.812537354, 10.003822086))
        make_face()
    extrude(amount=BOSS_EXTRUDE4_DEPTH)


solid = Compound([part.part, body_2.part])
